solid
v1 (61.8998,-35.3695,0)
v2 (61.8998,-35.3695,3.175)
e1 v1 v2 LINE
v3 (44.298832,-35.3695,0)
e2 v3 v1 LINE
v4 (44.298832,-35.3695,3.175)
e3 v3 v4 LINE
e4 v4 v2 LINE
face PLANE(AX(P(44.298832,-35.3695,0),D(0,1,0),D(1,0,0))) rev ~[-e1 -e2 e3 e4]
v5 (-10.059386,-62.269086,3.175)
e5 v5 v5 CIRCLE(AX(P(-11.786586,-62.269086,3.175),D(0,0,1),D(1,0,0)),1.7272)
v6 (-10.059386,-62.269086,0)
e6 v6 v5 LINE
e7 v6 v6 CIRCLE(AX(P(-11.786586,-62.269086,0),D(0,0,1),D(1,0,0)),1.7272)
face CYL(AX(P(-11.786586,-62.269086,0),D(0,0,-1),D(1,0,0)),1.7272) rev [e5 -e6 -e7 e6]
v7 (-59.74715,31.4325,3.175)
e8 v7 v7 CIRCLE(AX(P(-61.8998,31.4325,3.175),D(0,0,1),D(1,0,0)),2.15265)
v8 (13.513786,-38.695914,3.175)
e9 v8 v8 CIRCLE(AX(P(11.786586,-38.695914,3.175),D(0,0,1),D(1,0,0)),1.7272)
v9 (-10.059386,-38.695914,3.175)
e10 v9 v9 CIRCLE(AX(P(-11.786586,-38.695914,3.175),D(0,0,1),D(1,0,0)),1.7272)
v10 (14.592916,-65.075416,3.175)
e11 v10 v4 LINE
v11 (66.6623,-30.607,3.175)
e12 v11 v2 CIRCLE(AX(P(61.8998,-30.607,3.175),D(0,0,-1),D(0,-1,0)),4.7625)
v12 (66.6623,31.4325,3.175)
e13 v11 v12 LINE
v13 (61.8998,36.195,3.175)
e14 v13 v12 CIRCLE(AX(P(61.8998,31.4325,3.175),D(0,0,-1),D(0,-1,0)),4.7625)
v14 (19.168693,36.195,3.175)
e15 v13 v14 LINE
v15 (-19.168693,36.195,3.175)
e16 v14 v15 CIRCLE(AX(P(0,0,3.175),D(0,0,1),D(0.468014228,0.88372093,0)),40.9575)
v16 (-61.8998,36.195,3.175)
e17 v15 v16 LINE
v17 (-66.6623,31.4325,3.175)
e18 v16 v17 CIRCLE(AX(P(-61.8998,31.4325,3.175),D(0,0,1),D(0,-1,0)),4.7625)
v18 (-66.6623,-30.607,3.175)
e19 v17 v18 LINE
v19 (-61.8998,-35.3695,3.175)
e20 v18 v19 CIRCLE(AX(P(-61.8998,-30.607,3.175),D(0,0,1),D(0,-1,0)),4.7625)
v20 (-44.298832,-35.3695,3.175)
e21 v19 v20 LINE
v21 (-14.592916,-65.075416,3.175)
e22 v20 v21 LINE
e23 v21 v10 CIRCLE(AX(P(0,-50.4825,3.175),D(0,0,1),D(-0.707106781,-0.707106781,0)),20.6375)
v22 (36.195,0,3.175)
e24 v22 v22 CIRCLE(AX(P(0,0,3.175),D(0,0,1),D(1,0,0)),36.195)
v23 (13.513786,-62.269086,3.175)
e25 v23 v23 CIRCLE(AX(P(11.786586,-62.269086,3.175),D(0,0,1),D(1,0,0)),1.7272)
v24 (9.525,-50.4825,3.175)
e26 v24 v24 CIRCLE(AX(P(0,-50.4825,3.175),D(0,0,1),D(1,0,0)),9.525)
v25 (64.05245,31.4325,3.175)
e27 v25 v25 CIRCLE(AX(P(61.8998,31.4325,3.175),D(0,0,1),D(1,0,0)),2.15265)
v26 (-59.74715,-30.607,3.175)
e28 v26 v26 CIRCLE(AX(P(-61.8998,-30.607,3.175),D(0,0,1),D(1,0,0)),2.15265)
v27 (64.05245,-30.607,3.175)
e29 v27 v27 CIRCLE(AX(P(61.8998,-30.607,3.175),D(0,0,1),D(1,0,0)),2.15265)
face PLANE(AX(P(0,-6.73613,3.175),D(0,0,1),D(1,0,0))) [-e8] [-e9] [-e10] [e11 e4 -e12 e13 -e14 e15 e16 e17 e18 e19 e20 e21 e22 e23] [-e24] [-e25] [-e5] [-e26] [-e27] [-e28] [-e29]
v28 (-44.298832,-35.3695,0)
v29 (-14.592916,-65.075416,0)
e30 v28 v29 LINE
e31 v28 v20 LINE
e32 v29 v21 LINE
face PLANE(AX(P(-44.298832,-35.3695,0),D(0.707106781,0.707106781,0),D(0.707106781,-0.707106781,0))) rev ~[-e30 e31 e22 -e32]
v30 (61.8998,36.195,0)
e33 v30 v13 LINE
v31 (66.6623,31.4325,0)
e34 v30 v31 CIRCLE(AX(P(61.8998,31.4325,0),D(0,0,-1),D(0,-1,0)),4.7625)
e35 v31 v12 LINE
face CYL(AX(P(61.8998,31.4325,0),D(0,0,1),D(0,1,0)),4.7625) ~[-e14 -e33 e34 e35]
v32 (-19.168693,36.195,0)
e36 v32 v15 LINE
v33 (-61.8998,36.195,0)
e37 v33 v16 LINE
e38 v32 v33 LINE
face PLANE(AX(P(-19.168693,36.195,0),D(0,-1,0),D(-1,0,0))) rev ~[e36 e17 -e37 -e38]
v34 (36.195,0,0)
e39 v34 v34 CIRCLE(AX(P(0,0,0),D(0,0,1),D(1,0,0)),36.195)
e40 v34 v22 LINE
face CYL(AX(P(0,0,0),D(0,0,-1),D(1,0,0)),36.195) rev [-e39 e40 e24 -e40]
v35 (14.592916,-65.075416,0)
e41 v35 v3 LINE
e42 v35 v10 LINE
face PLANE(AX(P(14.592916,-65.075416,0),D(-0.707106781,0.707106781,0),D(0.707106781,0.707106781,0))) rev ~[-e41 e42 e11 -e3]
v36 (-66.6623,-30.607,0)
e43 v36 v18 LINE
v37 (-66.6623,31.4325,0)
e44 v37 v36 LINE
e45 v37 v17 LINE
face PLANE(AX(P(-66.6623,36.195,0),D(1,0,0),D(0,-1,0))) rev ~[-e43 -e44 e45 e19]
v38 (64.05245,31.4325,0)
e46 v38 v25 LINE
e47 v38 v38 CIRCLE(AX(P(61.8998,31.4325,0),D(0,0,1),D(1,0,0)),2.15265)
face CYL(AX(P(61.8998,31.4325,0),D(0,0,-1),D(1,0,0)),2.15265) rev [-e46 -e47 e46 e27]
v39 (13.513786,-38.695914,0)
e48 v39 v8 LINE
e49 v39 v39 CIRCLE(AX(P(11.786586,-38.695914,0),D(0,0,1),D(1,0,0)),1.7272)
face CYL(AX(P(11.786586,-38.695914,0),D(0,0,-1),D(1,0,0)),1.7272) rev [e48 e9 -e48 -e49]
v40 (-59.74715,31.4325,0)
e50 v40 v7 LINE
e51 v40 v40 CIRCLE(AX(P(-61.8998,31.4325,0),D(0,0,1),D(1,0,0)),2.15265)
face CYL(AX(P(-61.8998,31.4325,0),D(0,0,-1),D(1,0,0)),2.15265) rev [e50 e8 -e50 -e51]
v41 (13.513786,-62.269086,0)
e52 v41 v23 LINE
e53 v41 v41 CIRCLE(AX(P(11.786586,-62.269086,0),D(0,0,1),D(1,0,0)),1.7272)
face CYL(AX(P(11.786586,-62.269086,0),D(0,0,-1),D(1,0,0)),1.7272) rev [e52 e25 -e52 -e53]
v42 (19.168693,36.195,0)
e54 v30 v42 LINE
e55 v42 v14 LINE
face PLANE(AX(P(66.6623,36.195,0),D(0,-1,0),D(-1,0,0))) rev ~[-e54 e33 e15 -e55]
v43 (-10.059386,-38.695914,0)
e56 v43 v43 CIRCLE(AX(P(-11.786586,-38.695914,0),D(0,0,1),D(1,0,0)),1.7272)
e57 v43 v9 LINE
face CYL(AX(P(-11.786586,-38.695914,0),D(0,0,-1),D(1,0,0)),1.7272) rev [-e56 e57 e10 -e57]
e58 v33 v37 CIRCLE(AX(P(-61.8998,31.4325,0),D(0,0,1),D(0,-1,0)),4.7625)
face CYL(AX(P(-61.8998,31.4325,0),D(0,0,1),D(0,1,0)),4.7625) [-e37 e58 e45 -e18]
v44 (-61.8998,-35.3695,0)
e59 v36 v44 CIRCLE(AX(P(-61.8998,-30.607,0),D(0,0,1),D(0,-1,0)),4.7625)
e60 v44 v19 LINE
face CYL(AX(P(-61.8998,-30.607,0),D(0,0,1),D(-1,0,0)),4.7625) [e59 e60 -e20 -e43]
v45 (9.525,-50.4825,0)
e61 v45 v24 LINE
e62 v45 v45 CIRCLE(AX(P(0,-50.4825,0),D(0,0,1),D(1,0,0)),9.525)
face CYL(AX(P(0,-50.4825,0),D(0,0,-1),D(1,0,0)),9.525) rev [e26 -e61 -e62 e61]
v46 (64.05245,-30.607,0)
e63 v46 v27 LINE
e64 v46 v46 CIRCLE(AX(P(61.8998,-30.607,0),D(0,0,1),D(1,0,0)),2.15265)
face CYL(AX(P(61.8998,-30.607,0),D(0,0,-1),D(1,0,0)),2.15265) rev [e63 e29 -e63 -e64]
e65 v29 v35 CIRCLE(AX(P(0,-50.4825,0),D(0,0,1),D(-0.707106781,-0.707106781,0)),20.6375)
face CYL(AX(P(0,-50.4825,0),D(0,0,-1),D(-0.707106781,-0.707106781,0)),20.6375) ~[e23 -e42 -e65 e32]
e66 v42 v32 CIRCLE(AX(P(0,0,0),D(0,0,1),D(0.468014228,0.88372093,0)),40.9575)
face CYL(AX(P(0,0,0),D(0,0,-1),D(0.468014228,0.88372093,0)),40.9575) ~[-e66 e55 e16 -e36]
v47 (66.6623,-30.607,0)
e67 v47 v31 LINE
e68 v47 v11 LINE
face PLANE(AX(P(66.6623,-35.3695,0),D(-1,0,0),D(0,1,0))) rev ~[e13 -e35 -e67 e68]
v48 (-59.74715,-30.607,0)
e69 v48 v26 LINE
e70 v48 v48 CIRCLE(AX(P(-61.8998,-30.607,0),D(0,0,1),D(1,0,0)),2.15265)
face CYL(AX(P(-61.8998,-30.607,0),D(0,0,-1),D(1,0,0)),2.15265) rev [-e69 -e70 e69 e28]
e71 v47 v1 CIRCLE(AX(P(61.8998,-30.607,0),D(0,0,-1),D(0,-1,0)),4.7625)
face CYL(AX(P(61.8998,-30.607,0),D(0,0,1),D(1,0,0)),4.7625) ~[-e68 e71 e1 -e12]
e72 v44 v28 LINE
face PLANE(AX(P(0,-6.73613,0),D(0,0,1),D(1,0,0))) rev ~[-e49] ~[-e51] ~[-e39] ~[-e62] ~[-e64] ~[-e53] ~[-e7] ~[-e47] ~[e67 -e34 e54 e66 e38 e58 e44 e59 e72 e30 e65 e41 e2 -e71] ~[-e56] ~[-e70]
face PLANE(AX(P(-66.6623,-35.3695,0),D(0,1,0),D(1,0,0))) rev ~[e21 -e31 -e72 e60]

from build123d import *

# Parameters (mm, degrees)
F0_R     = 1.7272
F0_R_2   = 2.15265
F0_R_3   = 9.525
F0_R_4   = 36.195
F1_DEPTH = 3.175
F2_R     = 4.7625


with BuildPart() as f1:
    # F0 (on Top) → F1 (new body)
    with BuildSketch(Plane.XY):
        with BuildLine():
            Line((-19.1686927371, 36.195), (-66.6623, 36.195))
            Line((-66.6623, 36.195), (-66.6623, -35.3695))
            Line((-66.6623, -35.3695), (-44.2988323935, -35.3695))
            Line((-44.2988323935, -35.3695), (-14.5929161967, -65.0754161967))
            ThreePointArc((-14.5929161967, -65.0754161967), (0, -71.12), (14.5929161967, -65.0754161967))
            Line((14.5929161967, -65.0754161967), (44.2988323935, -35.3695))
            Line((44.2988323935, -35.3695), (66.6623, -35.3695))
            Line((66.6623, -35.3695), (66.6623, 36.195))
            Line((66.6623, 36.195), (19.1686927371, 36.195))
            ThreePointArc((19.1686927371, 36.195), (0, 40.9575), (-19.1686927371, 36.195))
        make_face()
        with Locations((-11.7865861589, -62.2690861589)):
            Circle(F0_R, mode=Mode.SUBTRACT)
        with Locations((-61.8998, -30.607)):
            Circle(F0_R_2, mode=Mode.SUBTRACT)
        with Locations((-11.7865861589, -38.6959138411)):
            Circle(F0_R, mode=Mode.SUBTRACT)
        with Locations((11.7865861589, -62.2690861589)):
            Circle(F0_R, mode=Mode.SUBTRACT)
        with Locations((0, -50.4825)):
            Circle(F0_R_3, mode=Mode.SUBTRACT)
        with Locations((11.7865861589, -38.6959138411)):
            Circle(F0_R, mode=Mode.SUBTRACT)
        with Locations((61.8998, -30.607)):
            Circle(F0_R_2, mode=Mode.SUBTRACT)
        with Locations((-61.8998, 31.4325)):
            Circle(F0_R_2, mode=Mode.SUBTRACT)
        Circle(F0_R_4, mode=Mode.SUBTRACT)
        with Locations((61.8998, 31.4325)):
            Circle(F0_R_2, mode=Mode.SUBTRACT)
    extrude(amount=F1_DEPTH)

    # F2
    f2_edges = [f1.edges().sort_by_distance(p)[0] for p in [
        (66.6623, -35.3695, 1.5875),
        (-66.6623, -35.3695, 1.5875),
        (66.6623, 36.195, 1.5875),
        (-66.6623, 36.195, 1.5875),
    ]]
    fillet(f2_edges, radius=F2_R)


solid = f1.part
